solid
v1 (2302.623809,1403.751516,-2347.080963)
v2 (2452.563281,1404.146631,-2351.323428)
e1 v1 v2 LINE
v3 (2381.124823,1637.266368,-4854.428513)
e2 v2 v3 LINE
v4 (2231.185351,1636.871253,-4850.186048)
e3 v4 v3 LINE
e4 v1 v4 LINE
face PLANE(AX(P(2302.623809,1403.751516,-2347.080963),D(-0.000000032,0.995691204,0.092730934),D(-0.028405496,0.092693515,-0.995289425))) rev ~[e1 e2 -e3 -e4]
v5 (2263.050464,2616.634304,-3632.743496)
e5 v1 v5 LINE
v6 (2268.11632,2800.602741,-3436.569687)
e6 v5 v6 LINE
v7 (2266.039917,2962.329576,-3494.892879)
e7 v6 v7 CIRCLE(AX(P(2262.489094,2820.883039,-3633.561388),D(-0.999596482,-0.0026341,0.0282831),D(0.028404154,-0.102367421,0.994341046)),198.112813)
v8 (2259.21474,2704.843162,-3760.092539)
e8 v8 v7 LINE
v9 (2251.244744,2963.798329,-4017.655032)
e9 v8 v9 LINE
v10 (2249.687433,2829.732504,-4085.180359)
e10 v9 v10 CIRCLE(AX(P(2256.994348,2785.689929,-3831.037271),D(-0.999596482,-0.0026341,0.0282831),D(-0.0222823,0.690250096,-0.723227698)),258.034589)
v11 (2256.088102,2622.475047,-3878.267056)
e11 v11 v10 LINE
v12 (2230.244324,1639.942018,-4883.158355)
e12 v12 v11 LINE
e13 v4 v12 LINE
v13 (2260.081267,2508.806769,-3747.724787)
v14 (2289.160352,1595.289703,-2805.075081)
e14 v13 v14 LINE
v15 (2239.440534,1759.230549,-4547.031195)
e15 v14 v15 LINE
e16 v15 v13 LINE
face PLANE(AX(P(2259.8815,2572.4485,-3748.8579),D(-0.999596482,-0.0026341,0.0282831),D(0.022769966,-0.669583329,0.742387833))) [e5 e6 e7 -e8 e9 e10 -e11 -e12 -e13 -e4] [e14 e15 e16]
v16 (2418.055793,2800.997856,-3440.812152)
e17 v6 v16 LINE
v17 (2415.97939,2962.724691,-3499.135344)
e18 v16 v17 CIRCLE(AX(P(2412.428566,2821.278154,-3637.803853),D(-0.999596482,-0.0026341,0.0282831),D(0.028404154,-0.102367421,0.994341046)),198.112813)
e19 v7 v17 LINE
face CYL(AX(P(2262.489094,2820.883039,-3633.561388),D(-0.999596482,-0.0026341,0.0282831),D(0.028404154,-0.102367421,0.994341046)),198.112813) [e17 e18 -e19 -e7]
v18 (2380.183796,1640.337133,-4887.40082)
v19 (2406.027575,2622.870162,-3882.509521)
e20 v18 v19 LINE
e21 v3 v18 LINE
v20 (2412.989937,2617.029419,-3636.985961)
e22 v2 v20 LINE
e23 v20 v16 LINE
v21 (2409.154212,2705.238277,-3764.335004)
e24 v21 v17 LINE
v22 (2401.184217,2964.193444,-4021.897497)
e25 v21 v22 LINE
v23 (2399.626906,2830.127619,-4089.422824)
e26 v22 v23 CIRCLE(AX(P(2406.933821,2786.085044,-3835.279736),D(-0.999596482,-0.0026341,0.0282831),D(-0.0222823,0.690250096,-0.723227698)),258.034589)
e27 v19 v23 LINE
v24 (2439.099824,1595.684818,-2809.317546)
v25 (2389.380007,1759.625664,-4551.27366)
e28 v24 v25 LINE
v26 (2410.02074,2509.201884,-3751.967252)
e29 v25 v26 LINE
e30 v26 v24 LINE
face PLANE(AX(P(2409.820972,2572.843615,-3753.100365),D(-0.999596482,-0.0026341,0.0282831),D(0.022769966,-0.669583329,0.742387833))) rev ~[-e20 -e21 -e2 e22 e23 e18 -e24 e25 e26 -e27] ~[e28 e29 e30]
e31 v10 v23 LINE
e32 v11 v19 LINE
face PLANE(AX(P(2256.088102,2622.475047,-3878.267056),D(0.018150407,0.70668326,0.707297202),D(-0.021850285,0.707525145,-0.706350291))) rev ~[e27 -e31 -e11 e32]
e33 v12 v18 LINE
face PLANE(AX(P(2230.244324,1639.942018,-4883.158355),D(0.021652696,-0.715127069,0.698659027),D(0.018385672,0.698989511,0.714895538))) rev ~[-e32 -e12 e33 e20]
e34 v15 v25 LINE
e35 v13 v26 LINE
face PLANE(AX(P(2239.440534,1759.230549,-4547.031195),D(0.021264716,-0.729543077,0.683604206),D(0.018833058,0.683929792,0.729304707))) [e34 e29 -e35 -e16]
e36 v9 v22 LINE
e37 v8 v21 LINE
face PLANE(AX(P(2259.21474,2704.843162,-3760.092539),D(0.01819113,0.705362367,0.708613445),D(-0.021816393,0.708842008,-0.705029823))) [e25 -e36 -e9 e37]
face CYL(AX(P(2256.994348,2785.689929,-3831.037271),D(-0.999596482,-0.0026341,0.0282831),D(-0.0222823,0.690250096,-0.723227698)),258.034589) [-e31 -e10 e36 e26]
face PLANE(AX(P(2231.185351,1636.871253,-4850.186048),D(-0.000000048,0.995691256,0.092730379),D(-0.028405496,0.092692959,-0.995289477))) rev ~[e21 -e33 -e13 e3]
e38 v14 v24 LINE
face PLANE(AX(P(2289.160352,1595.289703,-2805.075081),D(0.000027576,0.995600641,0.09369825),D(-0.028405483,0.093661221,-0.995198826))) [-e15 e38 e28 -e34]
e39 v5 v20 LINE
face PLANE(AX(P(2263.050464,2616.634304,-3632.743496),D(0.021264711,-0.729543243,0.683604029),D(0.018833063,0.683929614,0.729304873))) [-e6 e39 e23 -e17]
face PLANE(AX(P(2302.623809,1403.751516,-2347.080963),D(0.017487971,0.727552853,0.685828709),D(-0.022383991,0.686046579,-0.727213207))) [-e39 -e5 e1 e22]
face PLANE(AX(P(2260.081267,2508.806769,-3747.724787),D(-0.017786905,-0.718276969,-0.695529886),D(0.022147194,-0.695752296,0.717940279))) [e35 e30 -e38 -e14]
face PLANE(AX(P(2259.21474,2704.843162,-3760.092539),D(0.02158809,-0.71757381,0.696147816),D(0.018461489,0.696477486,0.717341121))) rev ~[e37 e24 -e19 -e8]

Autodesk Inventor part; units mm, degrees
sketch "Sketch1" plane through (0, 0, 0) normal (0, 0, 1) x (1, 0, 0)
  line L0 (2948.6488, 634.5525) -> (2841.4489, 559.4904)
  line L1 (2841.4489, 559.4904) -> (2956.2003, 395.6085)
  line L2 (2956.2003, 395.6085) -> (3063.4001, 470.6706)
  line L3 (1051.1773, 2444.1167) -> (976.8907, 2338.0244)
  line L4 (976.8907, 2338.0244) -> (1140.7211, 2223.3091)
  line L5 (1140.7211, 2223.3091) -> (1215.0077, 2329.4014)
  line L6 (-383.8501, 3232.1868) -> (-383.8501, 3052.6308)
  arc A0 (4065.9398, -2152.4924) -> (-383.8501, 3052.6308) centre (-4485.4868, -4958.3977) ccw
  arc A1 (1051.1773, 2444.1167) -> (-383.8501, 3232.1868) centre (-3980.604, -5017.8654) ccw
  arc A2 (2948.6488, 634.5525) -> (1215.0077, 2329.4014) centre (-4152.392, -4894.9339) ccw
  arc A3 (4300.883, -1939.8955) -> (3063.4001, 470.6706) centre (-4233.2291, -4798.0297) ccw
  arc A4 (4065.9398, -2152.4924) -> (4300.883, -1939.8955) centre (3657.2708, -1464.7499) ccw
  point P0 (0, 0)
  point P1 (4065.924, -2152.4924)
  point P2 (4065.924, -2152.4924)
  dimension "d8" = 9000
  dimension "d9" = 9000
  dimension "d10" = 9000
  dimension "d11" = 9000
  dimension "d12" = 800
ref_plane "Work Plane2" through (0, 0, -7900) normal (0, 0, 1) x (1, 0, 0)
ref_plane "Work Plane1" through (0, 0, 0) normal (0, 0, 1) x (1, 0, 0)
sketch "Sketch2" plane through (0, 0, -7900) normal (0, 0, 1) x (1, 0, 0)
  arc A0 (895.257, 3171.2695) -> (-383.8658, 4018.7524) centre (-4697.1096, -3880.3569) ccw projected
  line L0 (-383.8658, 4018.7524) -> (-383.8658, 3839.1061) projected
  arc A1 (4065.924, -2152.4924) -> (-383.8658, 3839.1061) centre (-4733.9746, -4039.7614) ccw projected
  line L1 (895.257, 3171.2695) -> (830.4728, 3059.0601) projected
  line L2 (830.4728, 3059.0601) -> (1003.6891, 2959.0536) projected
  line L3 (1068.4733, 3071.2631) -> (1003.6891, 2959.0536) projected
  arc A2 (2750.1419, 1279.62) -> (1068.4733, 3071.2631) centre (-4591.4319, -3926.2703) ccw projected
  line L4 (2750.1419, 1279.62) -> (2643.8882, 1205.2246) projected
  line L5 (2643.8882, 1205.2246) -> (2759.146, 1041.7698) projected
  line L6 (2865.5448, 1116.2711) -> (2759.146, 1041.7698) projected
  arc A3 (4310.9102, -1926.005) -> (2865.5448, 1116.2711) centre (-4397.3898, -4198.7812) ccw projected
  arc A4 (4065.924, -2152.4924) -> (4310.9102, -1926.005) centre (3657.2831, -1464.7333) ccw
  point P0 (0, 0)
  dimension "d7" = 800
loft "Loft1" add profiles "Sketch1", "Sketch2"
ref_plane "Work Plane3" through (2500, 0, 0) normal (1, 0, 0) x (0, 1, 0)
sketch "Sketch3" plane through (2500, 0, 0) normal (1, 0, 0) x (0, 1, 0)
  line L0 (2569.5835, -3718.0946) -> (1551.2045, -2616.5476)
  line L1 (1551.2045, -2616.5476) -> (1738.7871, -4630.7013)
  line L2 (1738.7871, -4630.7013) -> (2569.5835, -3718.0946)
  line L3 (4228.9662, 279.606) -> (-2269.9695, 279.606)
  line L4 (-2269.9695, 279.606) -> (-2269.9695, -8192.2559)
  line L5 (-2269.9695, -8192.2559) -> (4228.9662, -8192.2559)
  line L6 (4228.9662, -8192.2559) -> (4228.9662, 279.606)
  point P0 (0, 0)
extrude "Extrusion1" cut sketch "Sketch3" along normal through all both and the other way through all
ref_plane "Work Plane4" through (1945.737, 1551.2045, -2616.5476) normal (0, -0.9956912, -0.0927309) x (1, 0, 0)
sketch "Sketch5" plane through (1945.737, 1551.2045, -2616.5476) normal (0, -0.9956912, -0.0927309) x (1, 0, 0)
  line L0 (347.8734, 0) -> (290.3896, -2022.8698)
  point P0 (-1945.737, 2749.1181)
ref_plane "Work Plane5" through (2293.6104, 1551.2045, -2616.5476) normal (-0.6425282, -0.7644369, -0.052856) x (-0.0284055, 0.0926935, -0.9952894)
sketch "Sketch6" plane through (2293.6104, 1551.2045, -2616.5476) normal (-0.6425282, -0.7644369, -0.052856) x (-0.0284055, 0.0926935, -0.9952894)
  line L0 (-1061.9028, -2252.9112) -> (2197.0944, -2252.9112)
  line L1 (2197.0944, -2252.9112) -> (2197.0944, 343.7273)
  line L2 (2197.0944, 343.7273) -> (-1061.9028, 343.7273)
  line L3 (-1061.9028, 343.7273) -> (-1061.9028, -2252.9112)
  point P0 (-2682.8576, -979.2829)
extrude "Extrusion2" cut sketch "Sketch6" against normal through all
ref_plane "Work Plane6" through (2293.6104, 1551.2045, -2616.5476) normal (-0.9995965, -0.0026341, 0.0282831) x (-0.0284055, 0.0926935, -0.9952894)
sketch "Sketch7" plane through (2293.6104, 1551.2045, -2616.5476) normal (-0.6425282, -0.7644369, -0.052856) x (-0.0284055, 0.0926935, -0.9952894)
  line L0 (0, 0) -> (1222.5973, -1418.5767) projected
  line L1 (1222.5973, -1418.5767) -> (2023.6864, 0) projected
  point P0 (-2682.8576, -979.2829)
sketch "Sketch8" plane through (2293.6104, 1551.2045, -2616.5476) normal (-0.9995965, -0.0026341, 0.0282831) x (-0.0284055, 0.0926935, -0.9952894)
  line L0 (0, 0) -> (1222.5973, -911.8435) projected
  spline S0 degree 4 poles (2023.6864, 0) (1891.4174, -0.0605) (1759.1485, -0.1112) (1626.8795, -0.1518) (1361.543, -0.2126) (1228.4756, -0.2325) (1095.4081, -0.2417) (831.8573, -0.2379) (701.374, -0.2253) (570.8907, -0.2017) (330.3055, -0.1374) (220.2037, -0.0999) (110.1018, -0.0542) (0, 0) knots 0 0 0 0 0 0.261442 0.261442 0.261442 0.524462 0.524462 0.524462 0.782374 0.782374 0.782374 1 1 1 1 1 projected
  line L1 (1222.5973, -911.8435) -> (2023.6864, 0) projected
  point P0 (-2682.8576, 1301.8858)
loft "Loft2" add profiles "Sketch8" section 1 edges at (1733.119, 2060.394, -3167.3211) (2264.5827, 1645.2339, -3623.5941) (1704.3771, 2154.1853, -4174.3979)
sketch "Sketch9" plane through (2293.6104, 1551.2045, -2616.5476) normal (-0.9995965, -0.0026341, 0.0282831) x (-0.0284055, 0.0926935, -0.9952894)
  line L0 (1222.5973, -911.8435) -> (0, 0) projected
  line L1 (2023.6864, 0) -> (1222.5973, -911.8435) projected
  spline S0 degree 4 poles (0, 0) (110.1018, -0.0542) (220.2037, -0.0999) (330.3055, -0.1374) (570.8907, -0.2017) (701.374, -0.2253) (831.8573, -0.2379) (1095.4081, -0.2417) (1228.4756, -0.2325) (1361.543, -0.2126) (1626.8795, -0.1518) (1759.1485, -0.1112) (1891.4174, -0.0605) (2023.6864, 0) knots 0 0 0 0 0 0.217626 0.217626 0.217626 0.475538 0.475538 0.475538 0.738558 0.738558 0.738558 1 1 1 1 1 projected
  point P0 (-2682.8576, 1301.8858)
extrude "Extrusion3" add sketch "Sketch9" against normal blind 1
sketch "Sketch10" plane through (2294.61, 1551.2071, -2616.5759) normal (0.9995965, 0.0026341, -0.0282831) x (-0.0284055, 0.0926935, -0.9952894)
  line L0 (2023.6864, 0) -> (1222.5973, 911.8435) projected
  line L1 (1222.5973, 911.8435) -> (0, 0) projected
  point P0 (-2682.8576, -1301.8858)
sketch "Sketch11" plane through (2294.61, 1551.2071, -2616.5759) normal (0.9995965, 0.0026341, -0.0282831) x (-0.0284055, 0.0926935, -0.9952894)
  line L0 (-1104.2744, 1764.8294) -> (3009.0866, 1764.8294)
  line L1 (3009.0866, 1764.8294) -> (3009.0866, -1120.984)
  line L2 (3009.0866, -1120.984) -> (-1104.2744, -1120.984)
  line L3 (-1104.2744, -1120.984) -> (-1104.2744, 1764.8294)
  point P0 (-2682.8576, -1301.8858)
extrude "Extrusion4" cut sketch "Sketch11" against normal through all
ref_plane "Work Plane7" through (2259.8815, 2572.4485, -3748.8579) normal (-0.9995965, -0.0026341, 0.0282831) x (0.02277, -0.6695833, 0.7423878)
sketch "Sketch12" plane through (2259.8815, 2572.4485, -3748.8579) normal (-0.9995965, -0.0026341, 0.0282831) x (0.02277, -0.6695833, 0.7423878)
  line L0 (1824.1754, 71.0087) -> (-191.8191, -1432.5702)
  line L1 (-191.8191, -1432.5702) -> (-218.3749, -1452.3762)
  line L2 (1355.6088, -93.5273) -> (-48.5024, -1138.6261)
  line L3 (-48.5024, -1138.6261) -> (43.4592, -46.5069)
  line L4 (-218.3749, -1452.3762) -> (-129.6551, -49.5311)
  line L5 (1824.1754, 71.0087) -> (56.688, 110.5959)
  line L6 (56.688, 110.5959) -> (79.2582, 378.6347)
  line L7 (-129.6551, -49.5311) -> (-422.1869, -34.2052)
  line L8 (-97.0049, 90.8023) -> (-72.3771, 459.6792)
  line L9 (-97.0049, 90.8023) -> (-461.7897, 110.5959)
  arc A0 (-461.7897, 110.5959) -> (-422.1869, -34.2052) centre (-203.8576, 103.3236) ccw
  arc A1 (79.2582, 378.6347) -> (-72.3771, 459.6792) centre (-80.6938, 261.7407) ccw
  line L10 (43.4592, -46.5069) -> (1355.6088, -93.5273)
  point P0 (4454.1178, 560.366)
  point P1 (0, 0)
  point P2 (1525.1894, 0)
  point P3 (-97.0049, -1209.8729)
  point P4 (1451.8368, -21.9036)
extrude "Extrusion5" add sketch "Sketch12" against normal blind 150
ref_plane "Work Plane8" through (2334.8512, 2572.6461, -3750.9792) normal (-0.9995965, -0.0026341, 0.0282831) x (0.02277, -0.6695833, 0.7423878)
sketch "Sketch14" plane through (2334.8512, 2572.6461, -3750.9792) normal (-0.9995965, -0.0026341, 0.0282831) x (0.02277, -0.6695833, 0.7423878)
  line L0 (1451.8368, -21.9036) -> (43.4592, -46.5069) projected
  line L1 (43.4592, -46.5069) -> (-48.5024, -1138.6261) projected
  line L2 (-48.5024, -1138.6261) -> (1355.6088, -93.5273) projected
  line L3 (-48.5024, -1138.6261) -> (43.4592, -46.5069) projected
  line L4 (36.357, -130.8518) -> (1354.1445, -94.6172)
  line L5 (29.9819, -206.5611) -> (1254.1697, -169.0298)
  line L6 (23.4479, -284.1574) -> (1145.7195, -249.7507)
  line L7 (16.9375, -361.4743) -> (1037.66, -330.1809)
  line L8 (11.2021, -429.586) -> (925.5677, -413.6127)
  line L9 (5.2661, -500.0812) -> (833.993, -481.773)
  line L10 (5.2661, -580.2648) -> (718.4048, -567.8068)
  line L11 (5.2661, -580.2648) -> (-1.4957, -580.383)
  line L12 (-7.9772, -657.3559) -> (615.2506, -644.5859)
  line L13 (-14.4897, -734.6974) -> (512.2276, -721.2673)
  line L14 (-20.8834, -810.6278) -> (426.4206, -798.3271)
  line L15 (-26.6611, -879.2427) -> (308.1889, -873.136)
  line L16 (-32.3399, -946.6834) -> (221.1278, -937.9367)
  line L17 (-37.3457, -1006.1304) -> (133.6992, -1003.011)
  line L18 (-41.9227, -1060.4869) -> (56.4792, -1060.4869)
  line L19 (1355.6088, -93.5273) -> (-48.5024, -1138.6261) projected
  line L20 (116.3671, -52.6461) -> (14.2049, -1091.9522)
  line L21 (190.5781, -52.6461) -> (82.9233, -1040.8042)
  line L22 (190.5781, -52.6461) -> (191.5287, -43.9202)
  line L23 (116.3671, -52.6461) -> (117.0971, -45.2205)
  line L24 (264.8096, -42.6401) -> (168.5004, -977.108)
  line L25 (335.0568, -41.4129) -> (244.4471, -920.5799)
  line L26 (405.5718, -40.181) -> (320.6833, -863.8362)
  line L27 (43.4592, -46.5069) -> (1451.8368, -21.9036) projected
  line L28 (494.8216, -38.6219) -> (401.4074, -815.2786)
  line L29 (584.5837, -37.0538) -> (494.8216, -734.2227)
  line L30 (673.0821, -35.5078) -> (584.5837, -667.4116)
  line L31 (761.0304, -33.9714) -> (682.5265, -594.5115)
  line L32 (845.2654, -32.4999) -> (776.3341, -524.6893)
  line L33 (922.1945, -31.156) -> (862.0055, -460.9229)
  line L34 (1000.074, -29.7955) -> (948.7353, -396.3688)
  line L35 (1079.0786, -28.4154) -> (1030.8888, -335.2208)
  line L36 (1150.7176, -27.1639) -> (1111.7893, -275.0055)
  line L37 (1222.0396, -25.918) -> (1192.3317, -215.0567)
  line L38 (1300.3477, -24.55) -> (1272.1344, -155.6584)
  line L39 (1372.2211, -23.2944) -> (1361.9285, -88.8235)
  point P0 (4454.1178, 560.366)
  point P1 (108.8756, -128.8578)
  point P2 (182.4957, -126.8335)
  point P3 (174.2918, -202.1368)
  point P4 (101.4529, -204.3699)
  point P5 (79.4317, -428.3941)
  point P6 (149.7761, -427.1652)
  point P7 (142.1618, -497.0569)
  point P8 (72.531, -498.5951)
  point P9 (49.4829, -733.0662)
  point P10 (116.6363, -731.354)
  point P11 (108.3871, -807.0729)
  point P12 (42.0287, -808.8978)
  point P13 (256.3417, -124.803)
  point P14 (326.6617, -122.8694)
  point P15 (318.9492, -197.7019)
  point P16 (248.6062, -199.8585)
  point P17 (240.6042, -277.4998)
  point P18 (310.9472, -275.3432)
  point P19 (302.9741, -352.7049)
  point P20 (232.6311, -354.8615)
  point P21 (225.3153, -425.8456)
  point P22 (295.5625, -424.6184)
  point P23 (288.4297, -493.8255)
  point P24 (218.149, -495.3782)
  point P25 (209.7685, -576.6923)
  point P26 (280.0157, -575.4652)
  point P27 (272.1674, -651.6157)
  point P28 (201.8983, -653.0555)
  point P29 (194.032, -729.3806)
  point P30 (264.3374, -727.5879)
  point P31 (256.5654, -802.9981)
  point P32 (186.2454, -804.9319)
  point P33 (750.2112, -111.2233)
  point P34 (834.565, -108.9039)
  point P35 (824.2986, -182.2089)
  point P36 (739.9073, -184.7961)
  point P37 (729.0212, -262.5259)
  point P38 (813.4125, -259.9386)
  point P39 (802.5656, -337.3884)
  point P40 (718.1743, -339.9757)
  point P41 (707.3275, -417.4252)
  point P42 (791.5625, -415.9537)
  point P43 (782.1842, -482.9175)
  point P44 (697.8945, -484.7796)
  point P45 (911.6025, -106.7856)
  point P46 (989.5918, -104.6412)
  point P47 (979.3944, -177.4539)
  point P48 (901.3704, -179.846)
  point P49 (890.4843, -257.5757)
  point P50 (968.5083, -255.1837)
  point P51 (957.6614, -332.6335)
  point P52 (879.6374, -335.0256)
  point P53 (1067.4421, -102.5006)
  point P54 (1139.1944, -100.5276)
  point P55 (1127.8264, -172.9033)
  point P56 (1056.0383, -175.1042)
  point P57 (515.7923, -571.3463)
  point P58 (598.2394, -569.906)
  point P59 (587.7014, -645.1504)
  point P60 (506.0746, -646.8229)
  point P61 (535.2229, -420.4317)
  point P62 (619.3793, -418.9616)
  point P63 (609.8891, -486.7239)
  point P64 (526.4503, -488.5672)
  point P65 (554.8662, -267.8651)
  point P66 (640.9098, -265.2272)
  point P67 (630.0629, -342.677)
  point P68 (544.8979, -345.288)
  point P69 (574.4119, -116.0572)
  point P70 (662.139, -113.645)
  point P71 (651.7959, -187.4975)
  point P72 (564.8706, -190.1624)
  point P73 (350.5307, -574.2333)
  point P74 (430.5679, -572.8351)
  point P75 (421.4603, -648.5567)
  point P76 (342.7044, -650.1704)
  point P77 (366.0774, -423.3866)
  point P78 (448.7168, -421.9429)
  point P79 (440.4749, -490.4665)
  point P80 (358.9784, -492.267)
  point P81 (381.5584, -273.1784)
  point P82 (466.9246, -270.5613)
  point P83 (457.6148, -347.964)
  point P84 (373.5852, -350.5401)
  point P85 (397.2497, -120.9285)
  point P86 (485.2129, -118.5098)
  point P87 (476.268, -192.8788)
  point P88 (389.5603, -195.5371)
  point P89 (35.2249, -878.1141)
  point P90 (100.7778, -876.9186)
  point P91 (93.6509, -942.3357)
  point P92 (28.6916, -944.5773)
  point P93 (64.6049, -579.2282)
  point P94 (133.3405, -578.0275)
  point P95 (124.9949, -654.6313)
  point P96 (57.0561, -656.0234)
  point P97 (93.822, -281.9999)
  point P98 (165.8317, -279.7922)
  point P99 (157.402, -357.1679)
  point P100 (86.2186, -359.3502)
  point P101 (56.4792, -1060.4869)
  point P102 (17.2979, -1060.4869)
  point P103 (22.7488, -1005.0344)
  point P104 (86.9478, -1003.8636)
  point P105 (172.3641, -939.6195)
  point P106 (178.9732, -875.4925)
  point P107 (249.226, -874.2113)
  point P108 (244.4471, -920.5799)
  point P109 (402.9301, -802.6189)
  point P110 (403.37, -798.961)
  point P111 (327.1535, -801.0569)
  point P112 (334.9109, -725.7885)
  point P113 (412.4087, -723.8124)
  point P114 (408.0161, -798.8332)
  point P115 (496.4378, -721.6699)
  point P116 (682.5265, -594.5115)
  point P117 (686.1876, -568.3696)
  point P118 (862.0055, -460.9229)
  point P119 (868.4916, -414.6098)
  point P120 (1030.8888, -335.2208)
  point P121 (1043.8229, -252.8747)
  point P122 (1115.611, -250.6738)
  point P123 (1111.7893, -275.0055)
  point P124 (1199.2969, -170.7121)
  point P125 (1210.6292, -98.5634)
  point P126 (1284.8599, -96.5223)
  point P127 (1272.1344, -155.6584)
properties part number "panel_block_02" material "Wood (Maple)"
